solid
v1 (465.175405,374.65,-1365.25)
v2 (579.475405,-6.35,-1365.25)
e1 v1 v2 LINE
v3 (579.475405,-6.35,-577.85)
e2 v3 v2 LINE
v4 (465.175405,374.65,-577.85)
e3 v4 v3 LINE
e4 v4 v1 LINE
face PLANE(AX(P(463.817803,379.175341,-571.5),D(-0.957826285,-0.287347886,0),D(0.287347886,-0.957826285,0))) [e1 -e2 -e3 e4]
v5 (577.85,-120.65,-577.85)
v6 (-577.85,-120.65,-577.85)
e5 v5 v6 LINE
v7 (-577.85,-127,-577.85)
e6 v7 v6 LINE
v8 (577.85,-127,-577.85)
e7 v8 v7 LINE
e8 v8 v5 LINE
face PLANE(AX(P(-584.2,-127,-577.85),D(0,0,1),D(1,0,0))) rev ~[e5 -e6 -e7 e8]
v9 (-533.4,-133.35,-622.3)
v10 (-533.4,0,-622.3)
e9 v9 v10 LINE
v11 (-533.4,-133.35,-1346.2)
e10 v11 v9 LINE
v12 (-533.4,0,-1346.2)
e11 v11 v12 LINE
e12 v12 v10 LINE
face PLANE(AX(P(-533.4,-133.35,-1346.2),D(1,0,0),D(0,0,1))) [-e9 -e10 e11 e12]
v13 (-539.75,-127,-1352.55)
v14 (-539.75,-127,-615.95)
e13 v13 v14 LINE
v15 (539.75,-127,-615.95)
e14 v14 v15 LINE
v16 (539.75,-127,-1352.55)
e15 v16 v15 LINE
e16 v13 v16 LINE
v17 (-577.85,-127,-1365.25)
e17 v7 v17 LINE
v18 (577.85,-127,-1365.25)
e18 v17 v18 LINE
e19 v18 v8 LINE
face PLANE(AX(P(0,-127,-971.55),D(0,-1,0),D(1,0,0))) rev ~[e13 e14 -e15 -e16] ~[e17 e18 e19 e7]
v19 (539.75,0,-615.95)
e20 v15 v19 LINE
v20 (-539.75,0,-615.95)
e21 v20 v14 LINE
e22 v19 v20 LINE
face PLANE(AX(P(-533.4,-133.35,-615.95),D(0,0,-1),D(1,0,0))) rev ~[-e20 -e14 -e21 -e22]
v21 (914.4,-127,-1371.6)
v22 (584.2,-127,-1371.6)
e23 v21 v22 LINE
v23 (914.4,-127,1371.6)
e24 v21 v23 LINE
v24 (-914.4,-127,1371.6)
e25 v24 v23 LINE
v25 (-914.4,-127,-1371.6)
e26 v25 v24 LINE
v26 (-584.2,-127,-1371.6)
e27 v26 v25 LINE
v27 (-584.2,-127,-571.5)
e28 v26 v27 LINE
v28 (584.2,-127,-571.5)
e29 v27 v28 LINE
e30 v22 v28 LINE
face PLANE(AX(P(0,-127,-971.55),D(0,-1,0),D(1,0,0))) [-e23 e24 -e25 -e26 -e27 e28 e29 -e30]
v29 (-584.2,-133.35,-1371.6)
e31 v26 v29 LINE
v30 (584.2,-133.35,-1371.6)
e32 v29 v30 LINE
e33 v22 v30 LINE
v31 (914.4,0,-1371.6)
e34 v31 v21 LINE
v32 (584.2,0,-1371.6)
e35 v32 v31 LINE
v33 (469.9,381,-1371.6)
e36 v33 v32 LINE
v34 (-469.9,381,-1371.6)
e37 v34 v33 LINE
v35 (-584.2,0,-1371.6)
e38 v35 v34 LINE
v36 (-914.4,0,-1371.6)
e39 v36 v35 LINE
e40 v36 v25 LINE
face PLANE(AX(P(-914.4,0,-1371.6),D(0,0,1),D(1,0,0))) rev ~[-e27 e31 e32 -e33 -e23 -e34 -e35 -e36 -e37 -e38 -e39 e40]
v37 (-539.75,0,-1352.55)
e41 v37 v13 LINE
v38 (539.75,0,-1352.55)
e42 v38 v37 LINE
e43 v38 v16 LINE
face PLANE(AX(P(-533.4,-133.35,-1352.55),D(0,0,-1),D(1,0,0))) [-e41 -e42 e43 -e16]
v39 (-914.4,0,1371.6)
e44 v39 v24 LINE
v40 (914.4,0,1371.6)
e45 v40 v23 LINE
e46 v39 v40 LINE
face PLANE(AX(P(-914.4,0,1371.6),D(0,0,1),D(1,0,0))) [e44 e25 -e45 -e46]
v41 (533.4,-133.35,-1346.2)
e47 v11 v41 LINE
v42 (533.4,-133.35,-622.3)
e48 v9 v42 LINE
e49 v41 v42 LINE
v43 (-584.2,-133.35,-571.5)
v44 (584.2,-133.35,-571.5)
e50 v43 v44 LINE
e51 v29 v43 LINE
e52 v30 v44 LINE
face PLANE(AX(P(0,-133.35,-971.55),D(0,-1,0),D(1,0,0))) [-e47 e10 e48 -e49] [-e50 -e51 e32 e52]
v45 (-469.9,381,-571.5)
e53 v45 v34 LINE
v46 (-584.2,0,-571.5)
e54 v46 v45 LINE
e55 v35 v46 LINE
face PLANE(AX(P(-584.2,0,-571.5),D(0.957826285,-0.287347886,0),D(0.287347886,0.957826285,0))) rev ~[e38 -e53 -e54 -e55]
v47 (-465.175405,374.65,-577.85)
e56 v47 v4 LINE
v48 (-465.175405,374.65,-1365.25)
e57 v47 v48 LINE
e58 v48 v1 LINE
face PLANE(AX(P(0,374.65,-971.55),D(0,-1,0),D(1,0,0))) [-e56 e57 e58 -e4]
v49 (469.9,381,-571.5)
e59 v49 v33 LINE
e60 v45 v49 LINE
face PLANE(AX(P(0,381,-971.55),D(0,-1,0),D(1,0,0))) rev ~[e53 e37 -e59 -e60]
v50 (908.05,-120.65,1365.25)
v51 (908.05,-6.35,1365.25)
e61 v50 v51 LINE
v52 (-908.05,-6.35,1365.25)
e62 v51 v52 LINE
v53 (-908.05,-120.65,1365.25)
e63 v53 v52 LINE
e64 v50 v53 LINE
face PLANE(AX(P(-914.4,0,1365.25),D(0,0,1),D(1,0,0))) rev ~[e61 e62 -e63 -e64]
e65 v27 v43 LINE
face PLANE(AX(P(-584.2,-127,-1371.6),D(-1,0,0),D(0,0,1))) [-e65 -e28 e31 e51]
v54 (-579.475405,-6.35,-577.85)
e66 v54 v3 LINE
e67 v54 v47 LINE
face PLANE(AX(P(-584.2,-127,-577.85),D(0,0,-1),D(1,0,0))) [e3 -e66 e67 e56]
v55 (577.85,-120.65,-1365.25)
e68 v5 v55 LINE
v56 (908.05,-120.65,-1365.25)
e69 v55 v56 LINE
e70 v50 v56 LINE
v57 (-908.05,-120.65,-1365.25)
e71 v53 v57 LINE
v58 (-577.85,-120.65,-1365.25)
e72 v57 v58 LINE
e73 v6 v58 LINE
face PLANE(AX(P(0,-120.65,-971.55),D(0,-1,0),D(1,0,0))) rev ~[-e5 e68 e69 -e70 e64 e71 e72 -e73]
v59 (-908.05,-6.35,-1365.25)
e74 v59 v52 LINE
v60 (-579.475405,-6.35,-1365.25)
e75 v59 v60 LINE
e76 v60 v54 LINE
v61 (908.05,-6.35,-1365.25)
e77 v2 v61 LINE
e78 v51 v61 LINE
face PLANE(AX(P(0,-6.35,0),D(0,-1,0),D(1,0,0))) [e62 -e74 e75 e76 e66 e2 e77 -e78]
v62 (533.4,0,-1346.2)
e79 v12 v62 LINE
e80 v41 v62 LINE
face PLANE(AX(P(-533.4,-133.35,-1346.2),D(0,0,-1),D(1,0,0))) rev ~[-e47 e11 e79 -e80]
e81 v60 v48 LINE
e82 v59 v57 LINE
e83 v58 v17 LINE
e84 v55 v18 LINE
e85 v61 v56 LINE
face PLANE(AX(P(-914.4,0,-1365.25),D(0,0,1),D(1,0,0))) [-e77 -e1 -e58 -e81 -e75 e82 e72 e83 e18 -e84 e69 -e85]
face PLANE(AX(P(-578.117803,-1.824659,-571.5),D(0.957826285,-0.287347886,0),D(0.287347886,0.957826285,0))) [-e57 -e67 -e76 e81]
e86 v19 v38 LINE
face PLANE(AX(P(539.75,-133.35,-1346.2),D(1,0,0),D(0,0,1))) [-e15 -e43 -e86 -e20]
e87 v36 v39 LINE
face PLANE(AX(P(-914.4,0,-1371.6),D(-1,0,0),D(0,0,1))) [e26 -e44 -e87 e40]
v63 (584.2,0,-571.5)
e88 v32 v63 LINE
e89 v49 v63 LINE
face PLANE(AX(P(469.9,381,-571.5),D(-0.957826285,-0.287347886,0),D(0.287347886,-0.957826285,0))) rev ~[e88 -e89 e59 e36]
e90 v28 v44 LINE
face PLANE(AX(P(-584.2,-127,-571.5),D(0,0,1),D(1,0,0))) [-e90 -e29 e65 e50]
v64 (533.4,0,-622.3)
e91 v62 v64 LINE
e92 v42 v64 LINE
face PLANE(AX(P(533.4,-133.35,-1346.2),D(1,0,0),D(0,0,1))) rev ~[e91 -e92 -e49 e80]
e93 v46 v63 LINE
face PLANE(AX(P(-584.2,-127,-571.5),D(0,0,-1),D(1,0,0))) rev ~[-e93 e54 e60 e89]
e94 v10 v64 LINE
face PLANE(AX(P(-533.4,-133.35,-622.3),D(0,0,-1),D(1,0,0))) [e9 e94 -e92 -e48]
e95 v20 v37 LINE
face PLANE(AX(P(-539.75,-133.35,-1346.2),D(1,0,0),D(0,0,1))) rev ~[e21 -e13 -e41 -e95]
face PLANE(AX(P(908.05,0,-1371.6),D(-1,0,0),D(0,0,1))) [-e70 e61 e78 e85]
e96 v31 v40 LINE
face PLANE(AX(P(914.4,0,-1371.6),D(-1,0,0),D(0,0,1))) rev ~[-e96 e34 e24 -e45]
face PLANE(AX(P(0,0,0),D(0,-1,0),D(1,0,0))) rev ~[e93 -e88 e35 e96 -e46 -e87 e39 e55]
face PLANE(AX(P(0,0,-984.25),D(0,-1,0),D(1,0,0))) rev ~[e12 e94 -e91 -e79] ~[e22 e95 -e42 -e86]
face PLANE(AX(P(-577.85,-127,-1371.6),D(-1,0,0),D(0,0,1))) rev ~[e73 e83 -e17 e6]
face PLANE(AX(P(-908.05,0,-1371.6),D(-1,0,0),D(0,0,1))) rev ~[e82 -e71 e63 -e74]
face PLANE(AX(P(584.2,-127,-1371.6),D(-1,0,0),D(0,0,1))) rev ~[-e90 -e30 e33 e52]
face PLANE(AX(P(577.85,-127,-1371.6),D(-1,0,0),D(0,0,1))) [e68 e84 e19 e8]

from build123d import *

# Parameters (mm, degrees)
F0_W          = 1828.8
F0_H          = 2743.2
F1_DEPTH      = 127
F2_W          = 1168.4
F2_H          = 800.1
F2_W_2        = 1066.8
F2_H_2        = 723.9
F3_DEPTH      = 508
F3_DEPTH_BACK = 6.35
F5_DEPTH      = 800.101
F6_W          = 1066.8
F6_H          = 723.9
F7_DEPTH      = 133.35
F8_T          = -6.35


# Not quite as in the source:
# - a shell that OpenCascade refuses in one call is made with other operations: the cavity is built on its own and cut out


with BuildPart() as f1:
    # F0 (on Front) → F1 (new body)
    with BuildSketch(Plane.XZ):
        Rectangle(F0_W, F0_H)
    extrude(amount=F1_DEPTH)

    # F2 (on face) → F3 (join, two sides)
    with BuildSketch(Plane.XZ.offset(127)) as f3_sk:
        with Locations((0, -971.55)):
            Rectangle(F2_W, F2_H)
        with Locations((0, -984.25)):
            Rectangle(F2_W_2, F2_H_2, mode=Mode.SUBTRACT)
        with Locations((0, -984.25)):
            Rectangle(F2_W_2, F2_H_2)
    extrude(amount=-F3_DEPTH)
    extrude(f3_sk.sketch, amount=F3_DEPTH_BACK)

    # F4 (on face) → F5 (cut, through all)
    with BuildSketch(Plane.XY.offset(-571.5)):
        Polygon((-469.9, 381), (-584.2, 381), (-584.2, 0), align=None)
        Polygon((584.2, 381), (469.9, 381), (584.2, 0), align=None)
    extrude(amount=-F5_DEPTH, mode=Mode.SUBTRACT)

    # F6 (on face) → F7 (cut)
    with BuildSketch(Plane.XZ.offset(133.35)):
        with Locations((0, -984.25)):
            Rectangle(F6_W, F6_H)
    extrude(amount=-F7_DEPTH, mode=Mode.SUBTRACT)

    # F8: a shell. OpenCascade refuses it in one call, so the cavity is built on its own and cut out:
    # the body offset inwards by the wall thickness, plus a prism from it out through each open face.
    f8_core = offset(f1.part, amount=F8_T, kind=Kind.INTERSECTION, mode=Mode.PRIVATE)
    f8_exits = [f8_core.faces().sort_by_distance(p)[0] for p in [
        (0, 6.35, -984.25),
    ]]
    add(f8_core, mode=Mode.SUBTRACT)
    extrude(f8_exits, amount=-F8_T, mode=Mode.SUBTRACT)


solid = f1.part
